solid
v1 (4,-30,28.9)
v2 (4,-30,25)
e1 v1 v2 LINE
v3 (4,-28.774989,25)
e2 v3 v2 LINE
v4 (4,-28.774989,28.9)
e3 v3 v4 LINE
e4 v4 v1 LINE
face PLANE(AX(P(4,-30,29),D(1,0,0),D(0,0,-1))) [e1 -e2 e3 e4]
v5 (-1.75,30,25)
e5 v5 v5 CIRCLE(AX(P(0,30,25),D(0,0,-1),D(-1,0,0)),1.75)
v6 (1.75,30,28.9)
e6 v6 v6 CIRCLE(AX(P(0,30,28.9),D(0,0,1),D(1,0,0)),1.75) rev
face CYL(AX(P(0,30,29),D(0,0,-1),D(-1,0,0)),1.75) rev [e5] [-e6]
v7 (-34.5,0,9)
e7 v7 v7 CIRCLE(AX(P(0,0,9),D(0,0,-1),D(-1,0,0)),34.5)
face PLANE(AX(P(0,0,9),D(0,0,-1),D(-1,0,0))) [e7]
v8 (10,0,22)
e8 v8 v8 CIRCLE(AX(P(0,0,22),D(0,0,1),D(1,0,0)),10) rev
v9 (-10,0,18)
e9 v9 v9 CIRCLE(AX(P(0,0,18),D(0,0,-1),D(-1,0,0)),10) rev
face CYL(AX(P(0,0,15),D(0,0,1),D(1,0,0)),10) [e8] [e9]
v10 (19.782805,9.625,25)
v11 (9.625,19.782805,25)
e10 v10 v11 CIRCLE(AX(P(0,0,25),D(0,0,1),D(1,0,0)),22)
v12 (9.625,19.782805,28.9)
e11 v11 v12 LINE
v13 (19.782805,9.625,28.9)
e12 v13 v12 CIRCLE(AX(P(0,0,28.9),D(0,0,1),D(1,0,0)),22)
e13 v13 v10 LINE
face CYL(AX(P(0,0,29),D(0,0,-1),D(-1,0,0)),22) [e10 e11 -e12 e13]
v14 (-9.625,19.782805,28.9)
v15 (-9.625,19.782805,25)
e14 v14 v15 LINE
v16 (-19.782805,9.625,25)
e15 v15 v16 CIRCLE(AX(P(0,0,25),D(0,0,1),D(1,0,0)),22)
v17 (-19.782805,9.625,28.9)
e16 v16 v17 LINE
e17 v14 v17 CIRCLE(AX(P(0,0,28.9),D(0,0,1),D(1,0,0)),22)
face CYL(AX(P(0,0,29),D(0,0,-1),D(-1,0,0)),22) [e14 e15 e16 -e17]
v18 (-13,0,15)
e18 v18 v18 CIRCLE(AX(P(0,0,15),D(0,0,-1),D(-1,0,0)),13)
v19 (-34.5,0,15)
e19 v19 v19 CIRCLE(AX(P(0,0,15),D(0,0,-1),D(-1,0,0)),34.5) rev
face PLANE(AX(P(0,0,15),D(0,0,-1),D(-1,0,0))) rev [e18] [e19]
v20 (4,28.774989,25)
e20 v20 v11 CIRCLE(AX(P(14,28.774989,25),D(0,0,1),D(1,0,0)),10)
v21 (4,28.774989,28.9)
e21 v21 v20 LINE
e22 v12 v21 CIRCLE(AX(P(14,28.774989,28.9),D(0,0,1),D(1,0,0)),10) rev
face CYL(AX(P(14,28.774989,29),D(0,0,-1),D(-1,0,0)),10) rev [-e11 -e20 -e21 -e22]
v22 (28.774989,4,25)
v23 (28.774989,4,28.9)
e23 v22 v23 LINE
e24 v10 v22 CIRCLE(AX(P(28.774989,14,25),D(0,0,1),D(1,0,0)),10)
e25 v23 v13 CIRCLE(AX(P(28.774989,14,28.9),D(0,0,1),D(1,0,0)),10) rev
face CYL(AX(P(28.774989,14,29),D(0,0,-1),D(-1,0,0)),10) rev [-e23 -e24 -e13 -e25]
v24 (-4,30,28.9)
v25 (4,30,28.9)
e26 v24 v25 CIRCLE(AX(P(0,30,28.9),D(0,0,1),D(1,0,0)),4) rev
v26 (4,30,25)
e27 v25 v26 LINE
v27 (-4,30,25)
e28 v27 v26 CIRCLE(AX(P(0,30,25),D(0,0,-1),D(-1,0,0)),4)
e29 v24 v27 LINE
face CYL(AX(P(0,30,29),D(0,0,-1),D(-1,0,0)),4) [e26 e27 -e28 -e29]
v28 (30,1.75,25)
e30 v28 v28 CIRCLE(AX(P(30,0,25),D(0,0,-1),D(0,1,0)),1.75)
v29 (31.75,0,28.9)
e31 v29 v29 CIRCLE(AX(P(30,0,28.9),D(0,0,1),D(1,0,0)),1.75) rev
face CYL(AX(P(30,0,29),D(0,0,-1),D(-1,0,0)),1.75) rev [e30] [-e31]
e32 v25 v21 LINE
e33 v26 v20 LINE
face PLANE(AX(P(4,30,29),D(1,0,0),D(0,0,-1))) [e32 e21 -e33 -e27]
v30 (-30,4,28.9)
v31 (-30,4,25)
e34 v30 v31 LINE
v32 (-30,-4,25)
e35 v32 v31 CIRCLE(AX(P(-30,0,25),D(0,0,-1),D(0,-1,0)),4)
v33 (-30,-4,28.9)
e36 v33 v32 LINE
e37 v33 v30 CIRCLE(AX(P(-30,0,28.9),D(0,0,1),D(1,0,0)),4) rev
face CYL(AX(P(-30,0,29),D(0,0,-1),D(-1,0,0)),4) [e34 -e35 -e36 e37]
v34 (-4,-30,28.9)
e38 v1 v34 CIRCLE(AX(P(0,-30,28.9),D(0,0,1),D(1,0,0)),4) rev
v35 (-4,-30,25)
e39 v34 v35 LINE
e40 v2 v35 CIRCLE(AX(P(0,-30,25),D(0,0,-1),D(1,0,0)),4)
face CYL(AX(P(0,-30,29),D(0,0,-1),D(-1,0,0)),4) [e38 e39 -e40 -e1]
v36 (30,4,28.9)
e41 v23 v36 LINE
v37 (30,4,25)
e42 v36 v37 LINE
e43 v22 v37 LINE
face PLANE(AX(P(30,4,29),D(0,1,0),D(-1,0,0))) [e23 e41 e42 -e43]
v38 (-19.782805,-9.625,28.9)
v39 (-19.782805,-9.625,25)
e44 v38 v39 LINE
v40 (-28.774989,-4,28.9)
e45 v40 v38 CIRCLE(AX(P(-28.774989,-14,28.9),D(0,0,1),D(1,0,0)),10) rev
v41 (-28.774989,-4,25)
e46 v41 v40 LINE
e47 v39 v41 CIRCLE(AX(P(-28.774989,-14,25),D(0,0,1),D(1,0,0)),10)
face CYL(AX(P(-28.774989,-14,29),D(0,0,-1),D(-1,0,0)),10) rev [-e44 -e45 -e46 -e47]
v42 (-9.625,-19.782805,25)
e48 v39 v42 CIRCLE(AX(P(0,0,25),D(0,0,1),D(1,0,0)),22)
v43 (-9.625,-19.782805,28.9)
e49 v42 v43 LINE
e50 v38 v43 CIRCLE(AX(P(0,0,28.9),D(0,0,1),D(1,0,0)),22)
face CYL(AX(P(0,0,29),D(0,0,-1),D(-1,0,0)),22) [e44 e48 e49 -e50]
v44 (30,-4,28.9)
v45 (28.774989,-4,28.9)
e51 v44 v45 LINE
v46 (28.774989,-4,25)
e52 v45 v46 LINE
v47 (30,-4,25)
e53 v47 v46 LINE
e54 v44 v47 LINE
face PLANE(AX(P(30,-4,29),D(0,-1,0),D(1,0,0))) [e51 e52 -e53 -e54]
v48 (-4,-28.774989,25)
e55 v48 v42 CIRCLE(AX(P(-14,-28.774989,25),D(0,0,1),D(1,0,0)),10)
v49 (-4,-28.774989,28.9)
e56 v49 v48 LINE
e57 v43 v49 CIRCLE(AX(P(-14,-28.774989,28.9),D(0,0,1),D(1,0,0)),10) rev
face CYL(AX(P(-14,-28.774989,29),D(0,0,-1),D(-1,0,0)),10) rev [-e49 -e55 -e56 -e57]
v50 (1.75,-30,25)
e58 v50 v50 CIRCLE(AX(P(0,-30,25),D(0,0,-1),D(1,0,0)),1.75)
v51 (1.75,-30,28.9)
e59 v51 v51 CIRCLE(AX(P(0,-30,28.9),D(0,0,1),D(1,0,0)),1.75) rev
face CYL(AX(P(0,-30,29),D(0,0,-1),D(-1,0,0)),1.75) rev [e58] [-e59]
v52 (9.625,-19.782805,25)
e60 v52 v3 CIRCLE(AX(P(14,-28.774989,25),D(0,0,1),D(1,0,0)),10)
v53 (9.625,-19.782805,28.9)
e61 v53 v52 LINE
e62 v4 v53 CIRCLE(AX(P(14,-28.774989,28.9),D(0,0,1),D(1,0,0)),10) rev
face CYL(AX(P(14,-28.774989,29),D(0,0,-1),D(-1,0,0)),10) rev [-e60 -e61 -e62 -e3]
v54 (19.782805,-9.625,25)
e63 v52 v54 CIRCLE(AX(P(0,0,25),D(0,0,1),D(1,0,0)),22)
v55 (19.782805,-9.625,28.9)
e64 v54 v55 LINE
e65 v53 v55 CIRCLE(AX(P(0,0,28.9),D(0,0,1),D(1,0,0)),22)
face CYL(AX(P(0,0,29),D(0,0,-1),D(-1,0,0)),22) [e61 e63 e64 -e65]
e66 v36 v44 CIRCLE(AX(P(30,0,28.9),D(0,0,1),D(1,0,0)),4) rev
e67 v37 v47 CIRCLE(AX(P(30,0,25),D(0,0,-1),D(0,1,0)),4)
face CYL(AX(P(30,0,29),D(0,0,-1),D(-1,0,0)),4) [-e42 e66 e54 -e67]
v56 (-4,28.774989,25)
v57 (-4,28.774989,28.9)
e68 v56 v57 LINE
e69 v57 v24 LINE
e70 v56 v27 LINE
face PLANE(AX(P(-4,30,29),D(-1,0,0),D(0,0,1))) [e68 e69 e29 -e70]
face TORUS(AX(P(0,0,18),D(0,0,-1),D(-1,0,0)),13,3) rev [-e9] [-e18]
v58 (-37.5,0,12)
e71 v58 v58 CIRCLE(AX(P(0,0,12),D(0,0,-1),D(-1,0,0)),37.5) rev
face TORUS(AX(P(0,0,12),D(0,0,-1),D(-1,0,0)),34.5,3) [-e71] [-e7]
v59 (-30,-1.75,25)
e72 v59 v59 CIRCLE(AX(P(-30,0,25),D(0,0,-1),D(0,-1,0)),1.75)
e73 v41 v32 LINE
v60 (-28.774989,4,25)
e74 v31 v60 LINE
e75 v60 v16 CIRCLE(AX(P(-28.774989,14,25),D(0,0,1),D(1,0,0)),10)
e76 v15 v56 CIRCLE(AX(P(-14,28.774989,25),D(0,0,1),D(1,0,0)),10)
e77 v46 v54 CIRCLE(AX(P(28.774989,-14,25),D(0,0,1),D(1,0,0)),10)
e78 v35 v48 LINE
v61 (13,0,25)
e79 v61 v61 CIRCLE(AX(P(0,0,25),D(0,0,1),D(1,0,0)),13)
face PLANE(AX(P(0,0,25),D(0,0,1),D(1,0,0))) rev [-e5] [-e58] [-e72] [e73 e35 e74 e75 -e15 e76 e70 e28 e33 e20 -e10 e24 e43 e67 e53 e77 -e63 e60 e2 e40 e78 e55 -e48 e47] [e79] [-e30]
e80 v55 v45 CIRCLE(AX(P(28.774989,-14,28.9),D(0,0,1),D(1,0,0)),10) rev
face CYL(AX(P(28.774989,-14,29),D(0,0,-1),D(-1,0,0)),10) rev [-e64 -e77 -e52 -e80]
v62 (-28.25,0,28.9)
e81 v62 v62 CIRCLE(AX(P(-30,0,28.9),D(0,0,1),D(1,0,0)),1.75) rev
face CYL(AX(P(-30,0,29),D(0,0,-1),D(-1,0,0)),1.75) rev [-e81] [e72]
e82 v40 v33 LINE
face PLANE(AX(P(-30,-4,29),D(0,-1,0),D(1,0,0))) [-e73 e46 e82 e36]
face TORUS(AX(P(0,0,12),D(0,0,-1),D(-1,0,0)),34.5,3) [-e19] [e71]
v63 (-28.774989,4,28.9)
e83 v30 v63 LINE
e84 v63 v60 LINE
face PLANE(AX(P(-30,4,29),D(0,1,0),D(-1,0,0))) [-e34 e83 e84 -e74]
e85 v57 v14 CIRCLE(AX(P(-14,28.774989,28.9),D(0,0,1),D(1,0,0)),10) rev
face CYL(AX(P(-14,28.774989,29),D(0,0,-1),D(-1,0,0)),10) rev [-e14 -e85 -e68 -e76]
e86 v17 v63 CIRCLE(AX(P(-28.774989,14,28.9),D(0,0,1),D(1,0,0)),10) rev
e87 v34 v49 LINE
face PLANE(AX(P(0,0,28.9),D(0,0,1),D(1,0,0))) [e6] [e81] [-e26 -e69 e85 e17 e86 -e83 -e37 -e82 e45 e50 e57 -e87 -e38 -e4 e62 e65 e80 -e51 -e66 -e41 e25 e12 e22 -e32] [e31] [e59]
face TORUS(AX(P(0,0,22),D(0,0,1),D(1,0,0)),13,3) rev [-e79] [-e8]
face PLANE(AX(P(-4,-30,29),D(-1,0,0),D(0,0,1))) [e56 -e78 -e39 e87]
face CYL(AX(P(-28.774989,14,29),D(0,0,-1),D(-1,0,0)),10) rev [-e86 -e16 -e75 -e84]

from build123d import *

# Parameters (mm, degrees)
SKETCH2_R           = 15
SKETCH1_R           = 25
SKETCH3_R           = 15
BOSS_EXTRUDE1_DEPTH = 5
FILLET1_R           = 10
SKETCH4_R           = 1.75
CUT_EXTRUDE1_DEPTH  = 130
SKETCH5_R           = 4
CUT_EXTRUDE2_DEPTH  = 130
SKETCH6_R           = 22
BOSS_EXTRUDE2_DEPTH = 4
SKETCH7_R           = 17
BOSS_EXTRUDE3_DEPTH = 20
SKETCH15_W          = 8.431609766
SKETCH15_H          = 4
SKETCH15_W_2        = 8.578672696
SKETCH18_R          = 12.5
CUT_EXTRUDE5_DEPTH  = 20
SKETCH19_R          = 47.987160243
CUT_EXTRUDE6_DEPTH  = 44.301270362
SKETCH20_R          = 1.75
BOSS_EXTRUDE5_DEPTH = 4
CIRPATTERN3_COUNT   = 4
FILLET2_R           = 10
CHAMFER1_SIZE       = 0.5
SKETCH22_W          = 15
SKETCH22_H          = 8
BOSS_EXTRUDE6_DEPTH = 7.5
CUT_EXTRUDE7_DEPTH  = 0.75
CHAMFER2_SIZE       = 3
CHAMFER3_SIZE       = 0.5
CUT_EXTRUDE8_START  = -0.1
SKETCH24_R          = 41.017326151
SKETCH24_R_2        = 17
CUT_EXTRUDE8_DEPTH  = 0.1
SKETCH26_W          = 86.249785383
SKETCH26_H          = 35.556355766
CUT_EXTRUDE9_DEPTH  = 50
SKETCH27_R          = 10
BOSS_EXTRUDE7_DEPTH = 10
SKETCH28_R          = 37.5
BOSS_EXTRUDE8_DEPTH = 6
FILLET3_R           = 3


with BuildPart() as part:
    # Sketch2 → Loft1 section 0
    with BuildSketch(Plane.XY.offset(20)):
        Circle(SKETCH2_R)
    # Sketch1 → Loft1 section 1
    with BuildSketch(Plane.XY):
        Circle(SKETCH1_R)
    loft()

    # Sketch3 → Boss-Extrude1 (add)
    with BuildSketch(Plane.XY.offset(20)):
        Circle(SKETCH3_R)
    extrude(amount=BOSS_EXTRUDE1_DEPTH)

    # Fillet1
    fillet1_edges = [part.edges().sort_by_distance(p)[0] for p in [
        (-15, 0, 20),
    ]]
    fillet(fillet1_edges, radius=FILLET1_R)

    # Sketch4 → Cut-Extrude1 (cut)
    with BuildSketch(Plane(origin=(0, 0, 0), x_dir=(-1, 0, 0), z_dir=(0, 0, -1))):
        with Locations((0, 20)):
            Circle(SKETCH4_R)
        with Locations((-20, 0)):
            Circle(SKETCH4_R)
        with Locations((0, -20)):
            Circle(SKETCH4_R)
        with Locations((20, 0)):
            Circle(SKETCH4_R)
    extrude(amount=-CUT_EXTRUDE1_DEPTH, mode=Mode.SUBTRACT)

    # Sketch5 → Cut-Extrude2 (cut)
    with BuildSketch(Plane(origin=(0, 0, 3), x_dir=(-1, 0, 0), z_dir=(0, 0, -1))):
        with Locations((0, 20)):
            Circle(SKETCH5_R)
        with Locations((20, 0)):
            Circle(SKETCH5_R)
        with Locations((-20, 0)):
            Circle(SKETCH5_R)
        with Locations((0, -20)):
            Circle(SKETCH5_R)
    extrude(amount=-CUT_EXTRUDE2_DEPTH, mode=Mode.SUBTRACT)

    # Sketch6 → Boss-Extrude2 (add)
    with BuildSketch(Plane.XY.offset(25)):
        Circle(SKETCH6_R)
    extrude(amount=BOSS_EXTRUDE2_DEPTH)

    # Sketch7 → Boss-Extrude3 (add)
    with BuildSketch(Plane.XY.offset(29)):
        Circle(SKETCH7_R)
    extrude(amount=BOSS_EXTRUDE3_DEPTH)

    # Sketch15 → Cut-Revolve1 (revolve, cut)
    with BuildSketch(Plane(origin=(0, 0, 0), x_dir=(1, 0, 0), z_dir=(0, 1, 0))):
        with Locations((-17.215804883, -35)):
            Rectangle(SKETCH15_W, SKETCH15_H)
        with Locations((-17.289336348, -43)):
            Rectangle(SKETCH15_W_2, SKETCH15_H)
    revolve(axis=Axis((0, 0, 29), (0, 0, 1)), mode=Mode.SUBTRACT)

    # Sketch18 → Cut-Extrude5 (cut)
    with BuildSketch(Plane(origin=(0, 0, 0), x_dir=(-1, 0, 0), z_dir=(0, 0, -1))):
        Circle(SKETCH18_R)
    extrude(amount=-CUT_EXTRUDE5_DEPTH, mode=Mode.SUBTRACT)

    # Sketch19 → Cut-Extrude6 (cut, through all)
    with BuildSketch(Plane(origin=(0, 0, 25), x_dir=(-1, 0, 0), z_dir=(0, 0, -1))):
        Circle(SKETCH19_R)
    extrude(amount=CUT_EXTRUDE6_DEPTH, mode=Mode.SUBTRACT)

    # Sketch20 → Boss-Extrude5 (add)
    with BuildSketch(Plane(origin=(0, 0, 25), x_dir=(-1, 0, 0), z_dir=(0, 0, -1))):
        with BuildLine():
            Line((-4, 30), (-4, 21.633307653))
            ThreePointArc((-4, 21.633307653), (0, 22), (4, 21.633307653))
            Line((4, 21.633307653), (4, 30))
            ThreePointArc((4, 30), (0, 34), (-4, 30))
        make_face()
        with Locations((0, 30)):
            Circle(SKETCH20_R, mode=Mode.SUBTRACT)
    boss_extrude5 = extrude(amount=-BOSS_EXTRUDE5_DEPTH)

    # CirPattern3: Boss-Extrude5 ×4 about axis
    cirpattern3_axis = Axis((0, 0, 0), (0, 0, 1))
    for i in range(1, CIRPATTERN3_COUNT):
        add(boss_extrude5.rotate(cirpattern3_axis, i * 360 / CIRPATTERN3_COUNT))

    # Fillet2
    fillet2_edges = [part.edges().sort_by_distance(p)[0] for p in [
        (-4, 21.633307653, 27),
        (4, 21.633307653, 27),
        (-21.633307653, -4, 27),
        (-21.633307653, 4, 27),
        (4, -21.633307653, 27),
        (-4, -21.633307653, 27),
        (21.633307653, 4, 27),
        (21.633307653, -4, 27),
    ]]
    fillet(fillet2_edges, radius=FILLET2_R)

    # Chamfer1
    chamfer1_edges = [part.edges().sort_by_distance(p)[0] for p in [
        (-17, 0, 49),
        (-17, 0, 37),
        (-17, 0, 33),
        (-17, 0, 45),
        (-17, 0, 41),
    ]]
    chamfer(chamfer1_edges, length=CHAMFER1_SIZE)

    # Sketch22 → Boss-Extrude6 (add, symmetric)
    with BuildSketch(Plane(origin=(0, 0, 0), x_dir=(1, 0, 0), z_dir=(0, 1, 0))):
        with Locations((0, -53)):
            Rectangle(SKETCH22_W, SKETCH22_H)
    extrude(amount=BOSS_EXTRUDE6_DEPTH, both=True)

    # Sketch23 → Cut-Extrude7 (cut, symmetric)
    with BuildSketch(Plane(origin=(0, 0, 0), x_dir=(1, 0, 0), z_dir=(0, 1, 0))):
        with BuildLine():
            Line((7.5, -53.009618943), (7.5, -49))
            Line((7.5, -49), (-7.5, -49))
            Line((-7.5, -49), (-7.5, -53.009618943))
            ThreePointArc((-7.5, -53.009618943), (0, -51), (7.5, -53.009618943))
        make_face()
    extrude(amount=CUT_EXTRUDE7_DEPTH, both=True, mode=Mode.SUBTRACT)

    # Chamfer2
    chamfer2_edges = [part.edges().sort_by_distance(p)[0] for p in [
        (7.5, -7.5, 53),
        (-7.5, -7.5, 53),
        (7.5, 7.5, 53),
        (-7.5, 7.5, 53),
    ]]
    chamfer(chamfer2_edges, length=CHAMFER2_SIZE)

    # Chamfer3
    chamfer3_edges = [part.edges().sort_by_distance(p)[0] for p in [
        (-7.5, -2.625, 49),
        (7.5, -2.625, 49),
        (7.5, 2.625, 49),
        (7.5, 0, 57),
        (0, -7.5, 57),
        (0, -7.5, 49),
        (0, 7.5, 57),
        (-7.5, 0, 57),
        (-6, 6, 57),
        (-6, -6, 57),
        (6, 6, 57),
        (6, -6, 57),
        (0, 7.5, 49),
        (-7.5, 2.625, 49),
        (6, -6, 49),
        (6, 6, 49),
        (-6, -6, 49),
        (-6, 6, 49),
    ]]
    chamfer(chamfer3_edges, length=CHAMFER3_SIZE)

    # Sketch24 → Cut-Extrude8 (cut)
    with BuildSketch(Plane.XY.offset(29).offset(CUT_EXTRUDE8_START)):
        Circle(SKETCH24_R)
        with Locations(Location((0, 0, 0), (0, 0, 180))):
            Circle(SKETCH24_R_2, mode=Mode.SUBTRACT)
    extrude(amount=CUT_EXTRUDE8_DEPTH, mode=Mode.SUBTRACT)

    # Sketch26 → Cut-Extrude9 (cut, symmetric)
    with BuildSketch(Plane(origin=(0, 0, 0), x_dir=(1, 0, 0), z_dir=(0, 1, 0))):
        with Locations((1.892134232, -46.678177883)):
            Rectangle(SKETCH26_W, SKETCH26_H)
    extrude(amount=CUT_EXTRUDE9_DEPTH, both=True, mode=Mode.SUBTRACT)

    # Sketch27 → Boss-Extrude7 (add)
    with BuildSketch(Plane(origin=(0, 0, 25), x_dir=(-1, 0, 0), z_dir=(0, 0, -1))):
        Circle(SKETCH27_R)
    extrude(amount=BOSS_EXTRUDE7_DEPTH)

    # Sketch28 → Boss-Extrude8 (add)
    with BuildSketch(Plane(origin=(0, 0, 15), x_dir=(-1, 0, 0), z_dir=(0, 0, -1))):
        Circle(SKETCH28_R)
    extrude(amount=BOSS_EXTRUDE8_DEPTH)

    # Fillet3
    fillet3_edges = [part.edges().sort_by_distance(p)[0] for p in [
        (10, 0, 25),
        (10, 0, 15),
        (37.5, 0, 15),
        (37.5, 0, 9),
    ]]
    fillet(fillet3_edges, radius=FILLET3_R - 0.0001)  # a hair under: the kernel refuses the full size


solid = part.part
